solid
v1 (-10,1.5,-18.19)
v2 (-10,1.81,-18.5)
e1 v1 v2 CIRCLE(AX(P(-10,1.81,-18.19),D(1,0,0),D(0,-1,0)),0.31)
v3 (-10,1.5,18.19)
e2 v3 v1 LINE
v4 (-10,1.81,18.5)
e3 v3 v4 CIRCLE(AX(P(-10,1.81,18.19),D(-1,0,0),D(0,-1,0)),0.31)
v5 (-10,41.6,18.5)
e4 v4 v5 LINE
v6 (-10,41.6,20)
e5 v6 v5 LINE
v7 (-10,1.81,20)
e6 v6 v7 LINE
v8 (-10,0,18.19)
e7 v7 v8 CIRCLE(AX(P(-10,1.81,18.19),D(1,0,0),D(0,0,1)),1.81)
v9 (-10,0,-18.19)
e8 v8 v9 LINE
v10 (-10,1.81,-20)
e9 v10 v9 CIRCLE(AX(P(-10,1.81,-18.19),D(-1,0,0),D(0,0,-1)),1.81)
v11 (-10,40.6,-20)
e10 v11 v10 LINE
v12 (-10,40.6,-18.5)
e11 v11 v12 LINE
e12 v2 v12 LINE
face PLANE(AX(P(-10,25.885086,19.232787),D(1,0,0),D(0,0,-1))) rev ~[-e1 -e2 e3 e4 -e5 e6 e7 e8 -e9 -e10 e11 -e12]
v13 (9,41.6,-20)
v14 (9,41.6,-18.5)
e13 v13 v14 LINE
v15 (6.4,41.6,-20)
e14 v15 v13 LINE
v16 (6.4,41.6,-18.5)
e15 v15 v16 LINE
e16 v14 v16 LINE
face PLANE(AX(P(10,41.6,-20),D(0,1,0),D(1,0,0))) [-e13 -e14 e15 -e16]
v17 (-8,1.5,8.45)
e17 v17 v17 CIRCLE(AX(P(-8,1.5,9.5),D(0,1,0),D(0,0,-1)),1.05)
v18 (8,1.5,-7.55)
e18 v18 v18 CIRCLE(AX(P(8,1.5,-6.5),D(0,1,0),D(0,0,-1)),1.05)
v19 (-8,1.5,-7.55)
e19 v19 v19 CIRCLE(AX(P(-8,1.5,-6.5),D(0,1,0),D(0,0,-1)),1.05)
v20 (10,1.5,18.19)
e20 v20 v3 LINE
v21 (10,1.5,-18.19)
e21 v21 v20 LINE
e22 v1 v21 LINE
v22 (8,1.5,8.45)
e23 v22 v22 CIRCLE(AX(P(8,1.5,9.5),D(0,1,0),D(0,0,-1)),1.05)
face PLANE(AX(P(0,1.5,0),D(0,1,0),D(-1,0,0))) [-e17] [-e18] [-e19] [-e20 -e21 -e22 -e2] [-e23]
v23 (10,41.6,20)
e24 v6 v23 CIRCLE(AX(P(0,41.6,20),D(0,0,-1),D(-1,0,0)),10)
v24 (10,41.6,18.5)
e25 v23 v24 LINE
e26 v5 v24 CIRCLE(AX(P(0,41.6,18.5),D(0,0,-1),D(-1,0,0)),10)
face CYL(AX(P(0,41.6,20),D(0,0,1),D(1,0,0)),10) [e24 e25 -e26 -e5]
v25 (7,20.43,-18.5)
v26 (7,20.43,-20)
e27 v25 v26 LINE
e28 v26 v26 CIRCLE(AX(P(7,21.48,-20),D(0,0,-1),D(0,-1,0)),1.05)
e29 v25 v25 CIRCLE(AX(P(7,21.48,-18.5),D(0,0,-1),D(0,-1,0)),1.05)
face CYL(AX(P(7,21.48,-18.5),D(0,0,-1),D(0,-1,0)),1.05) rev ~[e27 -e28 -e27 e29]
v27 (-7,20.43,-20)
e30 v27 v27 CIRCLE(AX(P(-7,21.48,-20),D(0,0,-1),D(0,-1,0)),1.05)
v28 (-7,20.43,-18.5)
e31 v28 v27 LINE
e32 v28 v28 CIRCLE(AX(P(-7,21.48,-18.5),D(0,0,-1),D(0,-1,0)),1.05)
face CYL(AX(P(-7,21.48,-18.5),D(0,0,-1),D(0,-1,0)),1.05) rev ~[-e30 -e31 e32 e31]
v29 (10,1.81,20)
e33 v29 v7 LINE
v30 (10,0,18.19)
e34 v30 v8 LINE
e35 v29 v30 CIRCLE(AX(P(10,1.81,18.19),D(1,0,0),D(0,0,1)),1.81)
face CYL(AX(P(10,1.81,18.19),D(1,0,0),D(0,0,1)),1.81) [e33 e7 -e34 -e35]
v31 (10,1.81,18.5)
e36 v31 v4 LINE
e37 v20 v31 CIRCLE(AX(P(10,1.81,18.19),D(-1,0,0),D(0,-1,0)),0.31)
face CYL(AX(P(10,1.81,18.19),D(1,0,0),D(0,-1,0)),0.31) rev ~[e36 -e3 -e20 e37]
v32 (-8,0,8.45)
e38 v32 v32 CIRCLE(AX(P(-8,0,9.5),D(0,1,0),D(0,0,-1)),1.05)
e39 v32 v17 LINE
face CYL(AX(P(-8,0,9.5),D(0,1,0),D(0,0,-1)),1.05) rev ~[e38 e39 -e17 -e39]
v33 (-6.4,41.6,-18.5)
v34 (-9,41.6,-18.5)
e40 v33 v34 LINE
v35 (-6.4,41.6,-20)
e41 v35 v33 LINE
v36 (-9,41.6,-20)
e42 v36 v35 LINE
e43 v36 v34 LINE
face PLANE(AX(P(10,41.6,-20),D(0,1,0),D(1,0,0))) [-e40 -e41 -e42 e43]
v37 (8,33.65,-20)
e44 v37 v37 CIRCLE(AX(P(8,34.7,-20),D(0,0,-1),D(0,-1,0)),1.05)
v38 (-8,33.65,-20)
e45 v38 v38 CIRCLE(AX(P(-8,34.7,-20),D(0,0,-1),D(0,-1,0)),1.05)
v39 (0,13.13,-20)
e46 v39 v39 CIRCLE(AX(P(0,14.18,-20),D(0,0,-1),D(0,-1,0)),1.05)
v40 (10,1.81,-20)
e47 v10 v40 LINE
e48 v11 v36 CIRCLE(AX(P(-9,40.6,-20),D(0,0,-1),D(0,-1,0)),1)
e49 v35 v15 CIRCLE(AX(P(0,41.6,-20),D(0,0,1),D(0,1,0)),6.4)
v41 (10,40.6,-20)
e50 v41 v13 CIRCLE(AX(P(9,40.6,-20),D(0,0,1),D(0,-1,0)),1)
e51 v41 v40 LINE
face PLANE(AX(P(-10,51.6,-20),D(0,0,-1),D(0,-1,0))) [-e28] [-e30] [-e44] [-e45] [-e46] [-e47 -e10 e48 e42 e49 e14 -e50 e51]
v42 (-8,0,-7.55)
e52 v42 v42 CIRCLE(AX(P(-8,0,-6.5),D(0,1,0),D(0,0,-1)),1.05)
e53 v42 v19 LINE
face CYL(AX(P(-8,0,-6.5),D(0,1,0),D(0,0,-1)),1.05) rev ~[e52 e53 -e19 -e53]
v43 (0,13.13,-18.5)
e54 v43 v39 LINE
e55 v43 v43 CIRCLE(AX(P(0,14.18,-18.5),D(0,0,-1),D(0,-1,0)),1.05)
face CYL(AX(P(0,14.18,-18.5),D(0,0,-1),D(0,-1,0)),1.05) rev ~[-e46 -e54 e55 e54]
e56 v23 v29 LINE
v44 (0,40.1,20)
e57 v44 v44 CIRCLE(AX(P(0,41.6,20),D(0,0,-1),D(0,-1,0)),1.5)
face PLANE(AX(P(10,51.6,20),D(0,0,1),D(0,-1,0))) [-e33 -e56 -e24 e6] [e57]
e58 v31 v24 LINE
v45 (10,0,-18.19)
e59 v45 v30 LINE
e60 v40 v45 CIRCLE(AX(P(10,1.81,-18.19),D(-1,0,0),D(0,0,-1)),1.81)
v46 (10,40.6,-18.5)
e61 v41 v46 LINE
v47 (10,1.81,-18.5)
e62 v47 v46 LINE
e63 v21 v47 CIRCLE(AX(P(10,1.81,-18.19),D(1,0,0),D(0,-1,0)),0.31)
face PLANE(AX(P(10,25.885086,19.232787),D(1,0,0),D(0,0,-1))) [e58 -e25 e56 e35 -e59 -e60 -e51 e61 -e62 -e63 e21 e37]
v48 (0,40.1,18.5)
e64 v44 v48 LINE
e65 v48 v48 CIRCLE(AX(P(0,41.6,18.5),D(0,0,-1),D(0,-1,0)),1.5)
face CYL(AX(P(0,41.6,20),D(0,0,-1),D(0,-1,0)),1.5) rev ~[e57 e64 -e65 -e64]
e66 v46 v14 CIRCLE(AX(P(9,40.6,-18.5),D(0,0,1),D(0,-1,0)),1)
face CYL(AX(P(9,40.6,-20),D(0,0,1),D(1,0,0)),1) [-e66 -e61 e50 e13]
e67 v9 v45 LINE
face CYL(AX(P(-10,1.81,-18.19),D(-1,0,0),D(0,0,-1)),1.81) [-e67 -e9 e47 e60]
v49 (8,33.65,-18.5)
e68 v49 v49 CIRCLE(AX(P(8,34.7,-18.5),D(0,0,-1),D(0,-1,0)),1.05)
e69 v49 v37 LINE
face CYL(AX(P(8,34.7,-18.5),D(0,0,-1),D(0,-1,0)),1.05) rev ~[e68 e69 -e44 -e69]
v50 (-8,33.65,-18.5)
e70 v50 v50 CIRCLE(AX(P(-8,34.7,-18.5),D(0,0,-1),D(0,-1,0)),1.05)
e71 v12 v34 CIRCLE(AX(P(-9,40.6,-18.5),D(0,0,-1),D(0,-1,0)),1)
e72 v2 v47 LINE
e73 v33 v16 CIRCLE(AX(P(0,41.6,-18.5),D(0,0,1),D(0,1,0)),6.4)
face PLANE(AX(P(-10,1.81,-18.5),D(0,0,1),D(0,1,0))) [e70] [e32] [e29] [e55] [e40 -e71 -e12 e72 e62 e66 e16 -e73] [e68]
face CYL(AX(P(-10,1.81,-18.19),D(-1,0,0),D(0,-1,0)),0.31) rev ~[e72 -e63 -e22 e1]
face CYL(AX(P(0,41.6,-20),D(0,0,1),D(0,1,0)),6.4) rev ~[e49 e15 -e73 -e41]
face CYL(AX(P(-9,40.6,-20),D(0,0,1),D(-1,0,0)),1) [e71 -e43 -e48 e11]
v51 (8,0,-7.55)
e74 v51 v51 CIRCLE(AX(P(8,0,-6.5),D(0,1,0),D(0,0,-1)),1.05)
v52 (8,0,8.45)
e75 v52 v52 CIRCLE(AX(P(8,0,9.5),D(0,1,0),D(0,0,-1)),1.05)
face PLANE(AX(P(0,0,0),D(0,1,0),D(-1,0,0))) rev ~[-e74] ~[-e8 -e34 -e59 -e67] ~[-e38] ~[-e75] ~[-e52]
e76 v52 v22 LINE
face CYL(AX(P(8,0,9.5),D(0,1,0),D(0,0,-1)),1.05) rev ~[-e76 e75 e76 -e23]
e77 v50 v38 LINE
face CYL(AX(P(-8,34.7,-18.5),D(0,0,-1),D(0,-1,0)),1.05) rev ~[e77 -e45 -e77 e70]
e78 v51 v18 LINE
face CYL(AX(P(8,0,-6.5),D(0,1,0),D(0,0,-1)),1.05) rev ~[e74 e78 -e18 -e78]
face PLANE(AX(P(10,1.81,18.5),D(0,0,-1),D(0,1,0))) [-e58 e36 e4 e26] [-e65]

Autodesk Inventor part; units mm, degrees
ref_plane "YZ Plane" through (0, 0, 0) normal (1, 0, 0) x (0, 1, 0)
ref_plane "XZ Plane" through (0, 0, 0) normal (0, 1, 0) x (-1, 0, 0)
ref_plane "XY Plane" through (0, 0, 0) normal (0, 0, 1) x (1, 0, 0)
sketch "Sketch1" plane through (0, 0, 0) normal (0, 1, 0) x (-1, 0, 0)
  line L0 (10, -18.5) -> (-10, -18.5)
  line L1 (-10, -18.5) -> (-10, 18.5)
  line L2 (-10, 18.5) -> (10, 18.5)
  line L3 (10, 18.5) -> (10, -18.5)
  point P0 (0, 0)
  dimension "d0" = 20
  dimension "d1" = 37
  dimension "d2" = 18.5
  dimension "d3" = 10
extrude "Plate1" add sketch "Sketch1" along normal blind 1.5
sketch "Sketch2" plane through (-10, 0, -20) normal (0, 0, 1) x (1, 0, 0)
  line L0 (20, 0) -> (0, 0)
  line L1 (0, 0) -> (0, 51.6)
  line L2 (0, 51.6) -> (20, 51.6)
  line L3 (20, 51.6) -> (20, 0)
edge flange "Flange1" height 51.6 angle 90 thickness 1.5 bend radius 0.31 thickness toward (0, 0, 1) relief tear relief width 1.5 relief depth 0.75 edges at (0, 1.5, -18.5) wall of the first edge with corners at (10, 0, -20) (-10, 0, -20) (-10, 51.6, -20) (10, 51.6, -20)
bend "Bend1"
corner "Corner1"
sketch "Sketch3" plane through (10, 0, 20) normal (0, 0, -1) x (-1, 0, 0)
  line L0 (20, 0) -> (0, 0)
  line L1 (0, 0) -> (0, 51.6)
  line L2 (0, 51.6) -> (20, 51.6)
  line L3 (20, 51.6) -> (20, 0)
edge flange "Flange2" height 51.6 angle 90 thickness 1.5 bend radius 0.31 thickness toward (0, 0, -1) relief tear relief width 1.5 relief depth 0.75 edges at (0, 1.5, 18.5) wall of the first edge with corners at (-10, 0, 20) (10, 0, 20) (10, 51.6, 20) (-10, 51.6, 20)
bend "Bend2"
corner "Corner2"
sketch "Sketch4" plane through (-10, 51.6, 20) normal (0, 0, 1) x (1, 0, 0)
  circle A0 centre (10, -10) radius 10
  line L0 (0, 0) -> (20, 0) projected
  line L1 (0, 0) -> (20, 0)
  line L2 (20, 0) -> (20, -10)
  line L3 (20, -10) -> (0, -10)
  line L4 (0, -10) -> (0, 0)
  line L5 (0, -49.79) -> (0, 0) projected
  point P0 (10, -51.6)
  point P1 (10, 0)
  dimension "d26" = 20
  dimension "d25" = 10
  dimension "d27" = 10
  dimension "d28" = 10
extrude "Extrusion1" cut sketch "Sketch4" against normal blind 10 contours L4 L0 A0 | A0 L0 L2
sketch "Sketch5" plane through (10, 51.6, -20) normal (0, 0, -1) x (-1, 0, 0)
  arc A0 (20, -10) -> (0, -10) centre (10, -10) ccw projected
  point P0 (10, -51.6)
hole "Hole1" at (0, 41.6, -20) direction (0, 0, 1) diameter 12.8 depth 1.5
sketch "Sketch6" plane through (10, 51.6, -20) normal (0, 0, -1) x (-1, 0, 0)
  line L0 (0, 0) -> (20, 0) projected
  circle A0 centre (10, -10) radius 6.4 projected
  line L1 (-4, 0) -> (24, 0)
  line L2 (24, 0) -> (24, -10)
  line L3 (24, -10) -> (-4, -10)
  line L4 (-4, -10) -> (-4, 0)
  line L5 (0, -49.79) -> (0, 0) projected
  line L6 (0, -49.79) -> (20, -49.79) projected
  point P0 (10, -51.6)
  dimension "d38" = 28
  dimension "d39" = 10
  dimension "d40" = 4
  dimension "d41" = 49.79
extrude "Extrusion2" cut sketch "Sketch6" against normal blind 10 contours L5 L3 L4 L1 | L0 L1 L2 L3 A0 L5 | A0 L3 picked at (9.2435, -8.0053)
sketch "Sketch7" plane through (-10, 1.81, -18.5) normal (0, 0, 1) x (1, 0, 0)
  circle A0 centre (10, 12.37) radius 0.7835 projected
  circle A1 centre (17, 19.67) radius 0.7835 projected
  line L0 (16.4, 39.79) -> (20, 39.79) projected
  line L1 (20, 0) -> (20, 39.79) projected
  line L2 (20, 0) -> (0, 0) projected
  line L3 (0, 39.79) -> (0, 0) projected
  line L4 (0, 39.79) -> (3.6, 39.79) projected
  arc A2 (3.6, 39.79) -> (16.4, 39.79) centre (10, 39.79) ccw projected
  circle A3 centre (3, 19.67) radius 0.7835 projected
  circle A4 centre (2, 32.89) radius 0.7835 projected
  circle A5 centre (18, 32.89) radius 0.7835 projected
  point P0 (10, -1.81)
hole "Hole2" at (0, 14.18, -18.5) at (-7, 21.48, -18.5) at (-8, 34.7, -18.5) at (8, 34.7, -18.5) at (7, 21.48, -18.5) direction (0, 0, -1) diameter 2.1 depth 1.5
fillet "Fillet1" radius 1 2 edges at (-10, 41.6, -19.25) (10, 41.6, -19.25)
sketch "Sketch8" plane through (-10, 1.81, 20) normal (0, 0, 1) x (1, 0, 0)
  arc A0 (20, 39.79) -> (0, 39.79) centre (10, 39.79) ccw projected
  point P0 (10, -1.81)
hole "Hole3" at (0, 41.6, 20) direction (0, 0, -1) diameter 3 depth 1.5
sketch "Sketch9" plane through (0, 0, 0) normal (0, -1, 0) x (1, 0, 0)
  line L0 (10.07, -24.6) -> (10.07, 7.5) projected
  line L1 (10, 20) -> (-10, 20) projected
  line L2 (10, 18.19) -> (10, -18.19) projected
  point P0 (0, 0)
  point P1 (8, 9.5)
  point P2 (8, -6.5)
  point P3 (-8, 9.5)
  point P4 (-8, -6.5)
  dimension "d59" = 2
  dimension "d60" = 10.5
  dimension "d63" = 16
  dimension "d66" = 16
hole "Hole4" at (8, 0, 9.5) at (8, 0, -6.5) at (-8, 0, 9.5) at (-8, 0, -6.5) direction (0, 1, 0) diameter 2.1 depth 1.5
equation "\"d36\" = Thickness"
equation "\"d49\" = Thickness"
equation "\"d57\" = Thickness"
equation "\"d74\" = Thickness"
equation "\"d4\" = Thickness"
equation "\"d5\" = BendReliefWidth"
equation "\"d6\" = BendReliefDepth"
equation "\"d7\" = MinimumRemnant"
equation "\"d8\" = TransitionRadius"
equation "\"d11\" = BendRadius"
equation "\"d12\" = CornerReliefSize"
equation "\"d13\" = GapSize"
equation "\"d14\" = JacobiRadiusSize"
equation "\"d15\" = BendReliefWidth"
equation "\"d16\" = BendReliefDepth"
equation "\"d17\" = MinimumRemnant"
equation "\"d18\" = TransitionRadius"
equation "\"d21\" = BendRadius"
equation "\"d22\" = CornerReliefSize"
equation "\"d23\" = GapSize"
equation "\"d24\" = JacobiRadiusSize"
equation "\"BendReliefWidth\" = Thickness"
equation "\"BendReliefDepth\" = 0.5 * Thickness"
equation "\"CornerReliefSize\" = 4 * Thickness"
equation "\"MinimumRemnant\" = 2 * Thickness"
equation "\"TransitionRadius\" = BendRadius"
equation "\"JacobiRadiusSize\" = BendRadius"
equation "\"GapSize\" = Thickness"
equation "\"Thickness\" = 1.5"
equation "\"BendRadius\" = 0.31"
properties part number "axis_9_bottom_frame" material "Aluminum 6061-AHC"
